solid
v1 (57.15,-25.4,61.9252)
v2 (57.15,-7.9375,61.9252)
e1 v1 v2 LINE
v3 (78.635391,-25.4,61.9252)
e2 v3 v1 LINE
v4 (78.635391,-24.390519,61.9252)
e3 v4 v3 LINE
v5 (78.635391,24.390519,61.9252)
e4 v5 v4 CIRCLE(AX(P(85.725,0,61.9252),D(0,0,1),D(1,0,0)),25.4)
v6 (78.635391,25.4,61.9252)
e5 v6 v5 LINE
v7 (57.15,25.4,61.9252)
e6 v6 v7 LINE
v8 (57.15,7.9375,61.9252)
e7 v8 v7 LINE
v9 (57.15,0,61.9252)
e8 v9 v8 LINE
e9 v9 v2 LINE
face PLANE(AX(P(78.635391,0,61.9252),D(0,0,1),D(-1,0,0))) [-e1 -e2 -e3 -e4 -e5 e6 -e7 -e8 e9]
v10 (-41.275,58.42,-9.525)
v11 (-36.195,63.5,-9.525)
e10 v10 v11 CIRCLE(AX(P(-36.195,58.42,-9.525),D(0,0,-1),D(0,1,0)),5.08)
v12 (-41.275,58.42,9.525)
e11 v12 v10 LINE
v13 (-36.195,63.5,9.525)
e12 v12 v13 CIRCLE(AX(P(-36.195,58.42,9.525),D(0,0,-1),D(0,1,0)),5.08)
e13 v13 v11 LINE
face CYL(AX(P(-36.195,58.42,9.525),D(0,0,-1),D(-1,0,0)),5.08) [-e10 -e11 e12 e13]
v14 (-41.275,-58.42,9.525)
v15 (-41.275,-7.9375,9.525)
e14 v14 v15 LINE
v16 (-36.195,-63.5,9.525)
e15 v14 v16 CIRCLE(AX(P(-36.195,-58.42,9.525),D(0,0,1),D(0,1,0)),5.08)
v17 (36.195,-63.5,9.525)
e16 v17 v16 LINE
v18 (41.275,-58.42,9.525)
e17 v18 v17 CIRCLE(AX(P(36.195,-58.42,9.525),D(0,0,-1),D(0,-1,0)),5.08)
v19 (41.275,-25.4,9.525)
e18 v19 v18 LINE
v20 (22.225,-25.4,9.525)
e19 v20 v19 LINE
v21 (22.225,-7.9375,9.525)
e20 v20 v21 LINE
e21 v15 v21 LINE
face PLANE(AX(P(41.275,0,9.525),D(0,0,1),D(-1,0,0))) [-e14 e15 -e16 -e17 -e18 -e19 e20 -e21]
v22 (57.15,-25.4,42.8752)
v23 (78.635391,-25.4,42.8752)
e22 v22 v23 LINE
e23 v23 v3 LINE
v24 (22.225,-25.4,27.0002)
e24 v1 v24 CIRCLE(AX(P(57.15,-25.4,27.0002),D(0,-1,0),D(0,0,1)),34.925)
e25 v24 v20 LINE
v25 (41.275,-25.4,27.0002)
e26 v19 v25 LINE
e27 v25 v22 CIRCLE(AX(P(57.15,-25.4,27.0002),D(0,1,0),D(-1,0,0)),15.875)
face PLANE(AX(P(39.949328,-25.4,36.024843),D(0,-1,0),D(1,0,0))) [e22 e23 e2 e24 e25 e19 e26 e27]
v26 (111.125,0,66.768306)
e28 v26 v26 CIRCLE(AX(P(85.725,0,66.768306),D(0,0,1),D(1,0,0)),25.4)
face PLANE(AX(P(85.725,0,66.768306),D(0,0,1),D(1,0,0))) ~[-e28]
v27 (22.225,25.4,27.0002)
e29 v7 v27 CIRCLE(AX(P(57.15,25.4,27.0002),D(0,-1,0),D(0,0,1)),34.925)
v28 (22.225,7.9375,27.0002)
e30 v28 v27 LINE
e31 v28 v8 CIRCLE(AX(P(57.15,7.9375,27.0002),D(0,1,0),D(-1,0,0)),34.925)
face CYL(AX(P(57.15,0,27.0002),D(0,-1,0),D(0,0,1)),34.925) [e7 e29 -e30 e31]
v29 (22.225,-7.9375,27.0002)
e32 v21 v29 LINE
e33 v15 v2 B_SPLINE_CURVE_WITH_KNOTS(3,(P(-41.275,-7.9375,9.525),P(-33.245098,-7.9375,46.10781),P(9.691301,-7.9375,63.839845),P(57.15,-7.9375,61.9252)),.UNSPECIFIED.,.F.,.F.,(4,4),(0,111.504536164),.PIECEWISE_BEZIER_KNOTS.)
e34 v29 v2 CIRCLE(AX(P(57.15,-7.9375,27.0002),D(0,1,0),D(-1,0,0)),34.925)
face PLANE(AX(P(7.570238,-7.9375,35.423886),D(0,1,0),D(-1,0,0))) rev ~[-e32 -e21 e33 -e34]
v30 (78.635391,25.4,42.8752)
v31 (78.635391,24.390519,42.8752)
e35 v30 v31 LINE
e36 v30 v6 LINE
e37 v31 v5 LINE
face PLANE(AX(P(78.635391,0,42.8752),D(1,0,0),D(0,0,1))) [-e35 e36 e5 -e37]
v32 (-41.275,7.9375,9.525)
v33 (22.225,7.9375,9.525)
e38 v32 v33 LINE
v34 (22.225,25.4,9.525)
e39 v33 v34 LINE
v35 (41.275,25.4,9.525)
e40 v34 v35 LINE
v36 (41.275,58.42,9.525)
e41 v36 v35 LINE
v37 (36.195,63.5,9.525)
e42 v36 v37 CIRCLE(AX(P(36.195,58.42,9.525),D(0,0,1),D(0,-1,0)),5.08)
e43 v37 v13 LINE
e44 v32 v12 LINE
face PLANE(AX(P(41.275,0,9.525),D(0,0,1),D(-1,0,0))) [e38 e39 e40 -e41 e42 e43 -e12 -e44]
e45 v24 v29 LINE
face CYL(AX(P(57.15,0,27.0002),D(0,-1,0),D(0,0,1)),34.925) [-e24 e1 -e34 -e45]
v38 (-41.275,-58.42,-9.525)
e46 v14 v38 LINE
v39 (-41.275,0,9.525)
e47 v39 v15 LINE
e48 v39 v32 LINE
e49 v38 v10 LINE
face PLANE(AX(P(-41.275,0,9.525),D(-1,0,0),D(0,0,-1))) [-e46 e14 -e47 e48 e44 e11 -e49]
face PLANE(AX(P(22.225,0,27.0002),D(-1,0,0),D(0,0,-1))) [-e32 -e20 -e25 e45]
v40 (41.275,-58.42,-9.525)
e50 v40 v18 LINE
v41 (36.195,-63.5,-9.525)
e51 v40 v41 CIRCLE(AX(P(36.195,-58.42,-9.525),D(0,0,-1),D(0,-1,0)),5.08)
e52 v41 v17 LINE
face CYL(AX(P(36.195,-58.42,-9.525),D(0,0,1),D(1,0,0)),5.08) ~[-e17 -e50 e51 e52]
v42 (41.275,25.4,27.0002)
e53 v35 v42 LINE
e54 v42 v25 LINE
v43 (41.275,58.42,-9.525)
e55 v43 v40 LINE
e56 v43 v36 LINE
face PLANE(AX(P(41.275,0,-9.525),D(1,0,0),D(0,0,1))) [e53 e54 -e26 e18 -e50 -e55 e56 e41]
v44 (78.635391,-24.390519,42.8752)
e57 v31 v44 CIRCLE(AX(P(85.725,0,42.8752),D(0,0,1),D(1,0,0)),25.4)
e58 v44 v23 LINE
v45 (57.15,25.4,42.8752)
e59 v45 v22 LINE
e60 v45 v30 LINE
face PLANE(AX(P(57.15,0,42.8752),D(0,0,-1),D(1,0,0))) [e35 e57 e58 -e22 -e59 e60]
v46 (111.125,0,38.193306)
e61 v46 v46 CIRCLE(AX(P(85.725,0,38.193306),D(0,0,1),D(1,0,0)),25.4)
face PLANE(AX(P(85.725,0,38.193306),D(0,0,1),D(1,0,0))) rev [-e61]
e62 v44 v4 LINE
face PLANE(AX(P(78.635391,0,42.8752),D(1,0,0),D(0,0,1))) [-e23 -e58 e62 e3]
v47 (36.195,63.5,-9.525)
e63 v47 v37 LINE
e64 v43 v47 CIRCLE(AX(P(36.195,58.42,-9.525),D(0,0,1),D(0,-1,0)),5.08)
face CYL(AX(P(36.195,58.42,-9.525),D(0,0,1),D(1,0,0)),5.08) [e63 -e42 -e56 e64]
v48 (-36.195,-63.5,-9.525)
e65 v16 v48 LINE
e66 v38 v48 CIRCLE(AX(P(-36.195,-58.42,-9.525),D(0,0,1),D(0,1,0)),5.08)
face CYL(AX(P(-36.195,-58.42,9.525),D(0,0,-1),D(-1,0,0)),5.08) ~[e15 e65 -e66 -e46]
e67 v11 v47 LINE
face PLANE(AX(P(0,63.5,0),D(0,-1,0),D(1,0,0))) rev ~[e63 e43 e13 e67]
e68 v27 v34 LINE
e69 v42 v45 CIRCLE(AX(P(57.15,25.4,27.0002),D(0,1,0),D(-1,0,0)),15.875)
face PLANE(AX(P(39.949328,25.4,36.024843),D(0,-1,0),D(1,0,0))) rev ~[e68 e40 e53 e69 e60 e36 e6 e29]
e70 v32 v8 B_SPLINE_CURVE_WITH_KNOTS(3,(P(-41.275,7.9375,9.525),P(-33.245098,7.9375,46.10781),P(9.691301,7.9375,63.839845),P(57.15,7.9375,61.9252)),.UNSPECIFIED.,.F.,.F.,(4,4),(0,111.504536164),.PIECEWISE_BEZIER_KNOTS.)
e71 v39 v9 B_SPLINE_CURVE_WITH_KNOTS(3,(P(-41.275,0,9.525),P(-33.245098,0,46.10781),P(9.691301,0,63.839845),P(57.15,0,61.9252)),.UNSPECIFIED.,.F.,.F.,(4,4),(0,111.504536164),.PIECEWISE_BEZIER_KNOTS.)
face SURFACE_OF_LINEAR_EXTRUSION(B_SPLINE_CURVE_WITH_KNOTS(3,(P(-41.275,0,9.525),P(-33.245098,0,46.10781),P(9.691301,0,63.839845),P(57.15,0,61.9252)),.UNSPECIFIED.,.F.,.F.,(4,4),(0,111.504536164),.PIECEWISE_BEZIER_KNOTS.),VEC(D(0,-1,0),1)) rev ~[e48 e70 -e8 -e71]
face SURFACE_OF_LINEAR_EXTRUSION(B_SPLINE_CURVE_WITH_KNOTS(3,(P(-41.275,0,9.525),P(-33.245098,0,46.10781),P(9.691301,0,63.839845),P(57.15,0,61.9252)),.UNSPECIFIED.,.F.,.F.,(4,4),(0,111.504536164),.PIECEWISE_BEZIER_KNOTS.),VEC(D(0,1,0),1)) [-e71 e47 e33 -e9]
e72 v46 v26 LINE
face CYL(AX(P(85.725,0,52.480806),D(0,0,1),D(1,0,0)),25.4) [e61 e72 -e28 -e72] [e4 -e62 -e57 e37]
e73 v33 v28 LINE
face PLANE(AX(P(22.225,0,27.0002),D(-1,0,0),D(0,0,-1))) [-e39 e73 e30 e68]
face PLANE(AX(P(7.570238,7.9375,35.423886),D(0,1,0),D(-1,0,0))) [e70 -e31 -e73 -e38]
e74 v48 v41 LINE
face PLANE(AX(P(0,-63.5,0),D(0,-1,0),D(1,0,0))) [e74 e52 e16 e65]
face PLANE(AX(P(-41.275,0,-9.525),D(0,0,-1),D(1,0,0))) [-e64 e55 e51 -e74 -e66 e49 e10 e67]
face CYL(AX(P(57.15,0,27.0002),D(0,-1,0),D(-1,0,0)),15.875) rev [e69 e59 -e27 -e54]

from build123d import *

# Parameters (mm, degrees)
F1_DEPTH = 63.5
F0_W     = 18.3103905071
F0_H     = 19.05
F2_DEPTH = 25.4
F3_DEPTH = 7.9375
F0_W_2   = 25.4
F0_H_2   = 28.575
F5_R     = 5.08


# Not quite as in the source:
# - a feature names something its author has since deleted; it is built from what else it names


with BuildPart() as f1:
    # F0 (on Front) → F1 (new body, symmetric)
    with BuildSketch(Plane.XZ):
        Polygon((-41.275, -9.525), (41.275, -9.525), (41.275, 9.525), (22.225, 9.525), (-41.275, 9.525), align=None)
    extrude(amount=F1_DEPTH, both=True)

    # F0 (on Front) → F2 (join, symmetric)
    with BuildSketch(Plane.XZ):
        with BuildLine():
            Line((22.225, 9.525), (41.275, 9.525))
            Line((41.275, 9.525), (41.275, 27.0002))
            ThreePointArc((41.275, 27.0002), (45.9246798487, 38.2255201513), (57.15, 42.8752))
            Line((57.15, 42.8752), (60.325, 42.8752))
            Line((60.325, 42.8752), (60.325, 61.9252))
            Line((60.325, 61.9252), (57.15, 61.9252))
            ThreePointArc((57.15, 61.9252), (32.4542956671, 51.6959043329), (22.225, 27.0002))
            Line((22.225, 27.0002), (22.225, 9.525))
        make_face()
        with Locations((69.4801952536, 52.4002)):
            Rectangle(F0_W, F0_H)
    extrude(amount=F2_DEPTH, both=True)

    # F0 (on Front) → F3 (join, symmetric)
    with BuildSketch(Plane.XZ):
        with BuildLine():
            add(Edge.make_bspline(
                [(-41.275, 9.525), (-33.2450978458, 46.1078099906), (9.6913008019, 63.8398453593), (57.15, 61.9252)],
                knots=[0, 0, 0, 0, 111.5045361635, 111.5045361635, 111.5045361635, 111.5045361635], degree=3))
            Line((-41.275, 9.525), (22.225, 9.525))
            Line((22.225, 9.525), (22.225, 27.0002))
            ThreePointArc((22.225, 27.0002), (32.4542956671, 51.6959043329), (57.15, 61.9252))
        make_face()
    extrude(amount=F3_DEPTH, both=True)

    # F0 (on Front) → F4 (revolve)
    with BuildSketch(Plane.XZ):
        with Locations((98.425, 52.4808056653)):
            Rectangle(F0_W_2, F0_H_2)
    revolve(axis=Axis((85.725, 0, 52.4808056653), (0, 0, 1)))

    # F5
    f5_edges = [f1.edges().sort_by_distance(p)[0] for p in [
        (41.275, -63.5, 0),
        (41.275, 63.5, 0),
        (-41.275, 63.5, 0),
        (-41.275, -63.5, 0),
    ]]
    fillet(f5_edges, radius=F5_R)


solid = f1.part
